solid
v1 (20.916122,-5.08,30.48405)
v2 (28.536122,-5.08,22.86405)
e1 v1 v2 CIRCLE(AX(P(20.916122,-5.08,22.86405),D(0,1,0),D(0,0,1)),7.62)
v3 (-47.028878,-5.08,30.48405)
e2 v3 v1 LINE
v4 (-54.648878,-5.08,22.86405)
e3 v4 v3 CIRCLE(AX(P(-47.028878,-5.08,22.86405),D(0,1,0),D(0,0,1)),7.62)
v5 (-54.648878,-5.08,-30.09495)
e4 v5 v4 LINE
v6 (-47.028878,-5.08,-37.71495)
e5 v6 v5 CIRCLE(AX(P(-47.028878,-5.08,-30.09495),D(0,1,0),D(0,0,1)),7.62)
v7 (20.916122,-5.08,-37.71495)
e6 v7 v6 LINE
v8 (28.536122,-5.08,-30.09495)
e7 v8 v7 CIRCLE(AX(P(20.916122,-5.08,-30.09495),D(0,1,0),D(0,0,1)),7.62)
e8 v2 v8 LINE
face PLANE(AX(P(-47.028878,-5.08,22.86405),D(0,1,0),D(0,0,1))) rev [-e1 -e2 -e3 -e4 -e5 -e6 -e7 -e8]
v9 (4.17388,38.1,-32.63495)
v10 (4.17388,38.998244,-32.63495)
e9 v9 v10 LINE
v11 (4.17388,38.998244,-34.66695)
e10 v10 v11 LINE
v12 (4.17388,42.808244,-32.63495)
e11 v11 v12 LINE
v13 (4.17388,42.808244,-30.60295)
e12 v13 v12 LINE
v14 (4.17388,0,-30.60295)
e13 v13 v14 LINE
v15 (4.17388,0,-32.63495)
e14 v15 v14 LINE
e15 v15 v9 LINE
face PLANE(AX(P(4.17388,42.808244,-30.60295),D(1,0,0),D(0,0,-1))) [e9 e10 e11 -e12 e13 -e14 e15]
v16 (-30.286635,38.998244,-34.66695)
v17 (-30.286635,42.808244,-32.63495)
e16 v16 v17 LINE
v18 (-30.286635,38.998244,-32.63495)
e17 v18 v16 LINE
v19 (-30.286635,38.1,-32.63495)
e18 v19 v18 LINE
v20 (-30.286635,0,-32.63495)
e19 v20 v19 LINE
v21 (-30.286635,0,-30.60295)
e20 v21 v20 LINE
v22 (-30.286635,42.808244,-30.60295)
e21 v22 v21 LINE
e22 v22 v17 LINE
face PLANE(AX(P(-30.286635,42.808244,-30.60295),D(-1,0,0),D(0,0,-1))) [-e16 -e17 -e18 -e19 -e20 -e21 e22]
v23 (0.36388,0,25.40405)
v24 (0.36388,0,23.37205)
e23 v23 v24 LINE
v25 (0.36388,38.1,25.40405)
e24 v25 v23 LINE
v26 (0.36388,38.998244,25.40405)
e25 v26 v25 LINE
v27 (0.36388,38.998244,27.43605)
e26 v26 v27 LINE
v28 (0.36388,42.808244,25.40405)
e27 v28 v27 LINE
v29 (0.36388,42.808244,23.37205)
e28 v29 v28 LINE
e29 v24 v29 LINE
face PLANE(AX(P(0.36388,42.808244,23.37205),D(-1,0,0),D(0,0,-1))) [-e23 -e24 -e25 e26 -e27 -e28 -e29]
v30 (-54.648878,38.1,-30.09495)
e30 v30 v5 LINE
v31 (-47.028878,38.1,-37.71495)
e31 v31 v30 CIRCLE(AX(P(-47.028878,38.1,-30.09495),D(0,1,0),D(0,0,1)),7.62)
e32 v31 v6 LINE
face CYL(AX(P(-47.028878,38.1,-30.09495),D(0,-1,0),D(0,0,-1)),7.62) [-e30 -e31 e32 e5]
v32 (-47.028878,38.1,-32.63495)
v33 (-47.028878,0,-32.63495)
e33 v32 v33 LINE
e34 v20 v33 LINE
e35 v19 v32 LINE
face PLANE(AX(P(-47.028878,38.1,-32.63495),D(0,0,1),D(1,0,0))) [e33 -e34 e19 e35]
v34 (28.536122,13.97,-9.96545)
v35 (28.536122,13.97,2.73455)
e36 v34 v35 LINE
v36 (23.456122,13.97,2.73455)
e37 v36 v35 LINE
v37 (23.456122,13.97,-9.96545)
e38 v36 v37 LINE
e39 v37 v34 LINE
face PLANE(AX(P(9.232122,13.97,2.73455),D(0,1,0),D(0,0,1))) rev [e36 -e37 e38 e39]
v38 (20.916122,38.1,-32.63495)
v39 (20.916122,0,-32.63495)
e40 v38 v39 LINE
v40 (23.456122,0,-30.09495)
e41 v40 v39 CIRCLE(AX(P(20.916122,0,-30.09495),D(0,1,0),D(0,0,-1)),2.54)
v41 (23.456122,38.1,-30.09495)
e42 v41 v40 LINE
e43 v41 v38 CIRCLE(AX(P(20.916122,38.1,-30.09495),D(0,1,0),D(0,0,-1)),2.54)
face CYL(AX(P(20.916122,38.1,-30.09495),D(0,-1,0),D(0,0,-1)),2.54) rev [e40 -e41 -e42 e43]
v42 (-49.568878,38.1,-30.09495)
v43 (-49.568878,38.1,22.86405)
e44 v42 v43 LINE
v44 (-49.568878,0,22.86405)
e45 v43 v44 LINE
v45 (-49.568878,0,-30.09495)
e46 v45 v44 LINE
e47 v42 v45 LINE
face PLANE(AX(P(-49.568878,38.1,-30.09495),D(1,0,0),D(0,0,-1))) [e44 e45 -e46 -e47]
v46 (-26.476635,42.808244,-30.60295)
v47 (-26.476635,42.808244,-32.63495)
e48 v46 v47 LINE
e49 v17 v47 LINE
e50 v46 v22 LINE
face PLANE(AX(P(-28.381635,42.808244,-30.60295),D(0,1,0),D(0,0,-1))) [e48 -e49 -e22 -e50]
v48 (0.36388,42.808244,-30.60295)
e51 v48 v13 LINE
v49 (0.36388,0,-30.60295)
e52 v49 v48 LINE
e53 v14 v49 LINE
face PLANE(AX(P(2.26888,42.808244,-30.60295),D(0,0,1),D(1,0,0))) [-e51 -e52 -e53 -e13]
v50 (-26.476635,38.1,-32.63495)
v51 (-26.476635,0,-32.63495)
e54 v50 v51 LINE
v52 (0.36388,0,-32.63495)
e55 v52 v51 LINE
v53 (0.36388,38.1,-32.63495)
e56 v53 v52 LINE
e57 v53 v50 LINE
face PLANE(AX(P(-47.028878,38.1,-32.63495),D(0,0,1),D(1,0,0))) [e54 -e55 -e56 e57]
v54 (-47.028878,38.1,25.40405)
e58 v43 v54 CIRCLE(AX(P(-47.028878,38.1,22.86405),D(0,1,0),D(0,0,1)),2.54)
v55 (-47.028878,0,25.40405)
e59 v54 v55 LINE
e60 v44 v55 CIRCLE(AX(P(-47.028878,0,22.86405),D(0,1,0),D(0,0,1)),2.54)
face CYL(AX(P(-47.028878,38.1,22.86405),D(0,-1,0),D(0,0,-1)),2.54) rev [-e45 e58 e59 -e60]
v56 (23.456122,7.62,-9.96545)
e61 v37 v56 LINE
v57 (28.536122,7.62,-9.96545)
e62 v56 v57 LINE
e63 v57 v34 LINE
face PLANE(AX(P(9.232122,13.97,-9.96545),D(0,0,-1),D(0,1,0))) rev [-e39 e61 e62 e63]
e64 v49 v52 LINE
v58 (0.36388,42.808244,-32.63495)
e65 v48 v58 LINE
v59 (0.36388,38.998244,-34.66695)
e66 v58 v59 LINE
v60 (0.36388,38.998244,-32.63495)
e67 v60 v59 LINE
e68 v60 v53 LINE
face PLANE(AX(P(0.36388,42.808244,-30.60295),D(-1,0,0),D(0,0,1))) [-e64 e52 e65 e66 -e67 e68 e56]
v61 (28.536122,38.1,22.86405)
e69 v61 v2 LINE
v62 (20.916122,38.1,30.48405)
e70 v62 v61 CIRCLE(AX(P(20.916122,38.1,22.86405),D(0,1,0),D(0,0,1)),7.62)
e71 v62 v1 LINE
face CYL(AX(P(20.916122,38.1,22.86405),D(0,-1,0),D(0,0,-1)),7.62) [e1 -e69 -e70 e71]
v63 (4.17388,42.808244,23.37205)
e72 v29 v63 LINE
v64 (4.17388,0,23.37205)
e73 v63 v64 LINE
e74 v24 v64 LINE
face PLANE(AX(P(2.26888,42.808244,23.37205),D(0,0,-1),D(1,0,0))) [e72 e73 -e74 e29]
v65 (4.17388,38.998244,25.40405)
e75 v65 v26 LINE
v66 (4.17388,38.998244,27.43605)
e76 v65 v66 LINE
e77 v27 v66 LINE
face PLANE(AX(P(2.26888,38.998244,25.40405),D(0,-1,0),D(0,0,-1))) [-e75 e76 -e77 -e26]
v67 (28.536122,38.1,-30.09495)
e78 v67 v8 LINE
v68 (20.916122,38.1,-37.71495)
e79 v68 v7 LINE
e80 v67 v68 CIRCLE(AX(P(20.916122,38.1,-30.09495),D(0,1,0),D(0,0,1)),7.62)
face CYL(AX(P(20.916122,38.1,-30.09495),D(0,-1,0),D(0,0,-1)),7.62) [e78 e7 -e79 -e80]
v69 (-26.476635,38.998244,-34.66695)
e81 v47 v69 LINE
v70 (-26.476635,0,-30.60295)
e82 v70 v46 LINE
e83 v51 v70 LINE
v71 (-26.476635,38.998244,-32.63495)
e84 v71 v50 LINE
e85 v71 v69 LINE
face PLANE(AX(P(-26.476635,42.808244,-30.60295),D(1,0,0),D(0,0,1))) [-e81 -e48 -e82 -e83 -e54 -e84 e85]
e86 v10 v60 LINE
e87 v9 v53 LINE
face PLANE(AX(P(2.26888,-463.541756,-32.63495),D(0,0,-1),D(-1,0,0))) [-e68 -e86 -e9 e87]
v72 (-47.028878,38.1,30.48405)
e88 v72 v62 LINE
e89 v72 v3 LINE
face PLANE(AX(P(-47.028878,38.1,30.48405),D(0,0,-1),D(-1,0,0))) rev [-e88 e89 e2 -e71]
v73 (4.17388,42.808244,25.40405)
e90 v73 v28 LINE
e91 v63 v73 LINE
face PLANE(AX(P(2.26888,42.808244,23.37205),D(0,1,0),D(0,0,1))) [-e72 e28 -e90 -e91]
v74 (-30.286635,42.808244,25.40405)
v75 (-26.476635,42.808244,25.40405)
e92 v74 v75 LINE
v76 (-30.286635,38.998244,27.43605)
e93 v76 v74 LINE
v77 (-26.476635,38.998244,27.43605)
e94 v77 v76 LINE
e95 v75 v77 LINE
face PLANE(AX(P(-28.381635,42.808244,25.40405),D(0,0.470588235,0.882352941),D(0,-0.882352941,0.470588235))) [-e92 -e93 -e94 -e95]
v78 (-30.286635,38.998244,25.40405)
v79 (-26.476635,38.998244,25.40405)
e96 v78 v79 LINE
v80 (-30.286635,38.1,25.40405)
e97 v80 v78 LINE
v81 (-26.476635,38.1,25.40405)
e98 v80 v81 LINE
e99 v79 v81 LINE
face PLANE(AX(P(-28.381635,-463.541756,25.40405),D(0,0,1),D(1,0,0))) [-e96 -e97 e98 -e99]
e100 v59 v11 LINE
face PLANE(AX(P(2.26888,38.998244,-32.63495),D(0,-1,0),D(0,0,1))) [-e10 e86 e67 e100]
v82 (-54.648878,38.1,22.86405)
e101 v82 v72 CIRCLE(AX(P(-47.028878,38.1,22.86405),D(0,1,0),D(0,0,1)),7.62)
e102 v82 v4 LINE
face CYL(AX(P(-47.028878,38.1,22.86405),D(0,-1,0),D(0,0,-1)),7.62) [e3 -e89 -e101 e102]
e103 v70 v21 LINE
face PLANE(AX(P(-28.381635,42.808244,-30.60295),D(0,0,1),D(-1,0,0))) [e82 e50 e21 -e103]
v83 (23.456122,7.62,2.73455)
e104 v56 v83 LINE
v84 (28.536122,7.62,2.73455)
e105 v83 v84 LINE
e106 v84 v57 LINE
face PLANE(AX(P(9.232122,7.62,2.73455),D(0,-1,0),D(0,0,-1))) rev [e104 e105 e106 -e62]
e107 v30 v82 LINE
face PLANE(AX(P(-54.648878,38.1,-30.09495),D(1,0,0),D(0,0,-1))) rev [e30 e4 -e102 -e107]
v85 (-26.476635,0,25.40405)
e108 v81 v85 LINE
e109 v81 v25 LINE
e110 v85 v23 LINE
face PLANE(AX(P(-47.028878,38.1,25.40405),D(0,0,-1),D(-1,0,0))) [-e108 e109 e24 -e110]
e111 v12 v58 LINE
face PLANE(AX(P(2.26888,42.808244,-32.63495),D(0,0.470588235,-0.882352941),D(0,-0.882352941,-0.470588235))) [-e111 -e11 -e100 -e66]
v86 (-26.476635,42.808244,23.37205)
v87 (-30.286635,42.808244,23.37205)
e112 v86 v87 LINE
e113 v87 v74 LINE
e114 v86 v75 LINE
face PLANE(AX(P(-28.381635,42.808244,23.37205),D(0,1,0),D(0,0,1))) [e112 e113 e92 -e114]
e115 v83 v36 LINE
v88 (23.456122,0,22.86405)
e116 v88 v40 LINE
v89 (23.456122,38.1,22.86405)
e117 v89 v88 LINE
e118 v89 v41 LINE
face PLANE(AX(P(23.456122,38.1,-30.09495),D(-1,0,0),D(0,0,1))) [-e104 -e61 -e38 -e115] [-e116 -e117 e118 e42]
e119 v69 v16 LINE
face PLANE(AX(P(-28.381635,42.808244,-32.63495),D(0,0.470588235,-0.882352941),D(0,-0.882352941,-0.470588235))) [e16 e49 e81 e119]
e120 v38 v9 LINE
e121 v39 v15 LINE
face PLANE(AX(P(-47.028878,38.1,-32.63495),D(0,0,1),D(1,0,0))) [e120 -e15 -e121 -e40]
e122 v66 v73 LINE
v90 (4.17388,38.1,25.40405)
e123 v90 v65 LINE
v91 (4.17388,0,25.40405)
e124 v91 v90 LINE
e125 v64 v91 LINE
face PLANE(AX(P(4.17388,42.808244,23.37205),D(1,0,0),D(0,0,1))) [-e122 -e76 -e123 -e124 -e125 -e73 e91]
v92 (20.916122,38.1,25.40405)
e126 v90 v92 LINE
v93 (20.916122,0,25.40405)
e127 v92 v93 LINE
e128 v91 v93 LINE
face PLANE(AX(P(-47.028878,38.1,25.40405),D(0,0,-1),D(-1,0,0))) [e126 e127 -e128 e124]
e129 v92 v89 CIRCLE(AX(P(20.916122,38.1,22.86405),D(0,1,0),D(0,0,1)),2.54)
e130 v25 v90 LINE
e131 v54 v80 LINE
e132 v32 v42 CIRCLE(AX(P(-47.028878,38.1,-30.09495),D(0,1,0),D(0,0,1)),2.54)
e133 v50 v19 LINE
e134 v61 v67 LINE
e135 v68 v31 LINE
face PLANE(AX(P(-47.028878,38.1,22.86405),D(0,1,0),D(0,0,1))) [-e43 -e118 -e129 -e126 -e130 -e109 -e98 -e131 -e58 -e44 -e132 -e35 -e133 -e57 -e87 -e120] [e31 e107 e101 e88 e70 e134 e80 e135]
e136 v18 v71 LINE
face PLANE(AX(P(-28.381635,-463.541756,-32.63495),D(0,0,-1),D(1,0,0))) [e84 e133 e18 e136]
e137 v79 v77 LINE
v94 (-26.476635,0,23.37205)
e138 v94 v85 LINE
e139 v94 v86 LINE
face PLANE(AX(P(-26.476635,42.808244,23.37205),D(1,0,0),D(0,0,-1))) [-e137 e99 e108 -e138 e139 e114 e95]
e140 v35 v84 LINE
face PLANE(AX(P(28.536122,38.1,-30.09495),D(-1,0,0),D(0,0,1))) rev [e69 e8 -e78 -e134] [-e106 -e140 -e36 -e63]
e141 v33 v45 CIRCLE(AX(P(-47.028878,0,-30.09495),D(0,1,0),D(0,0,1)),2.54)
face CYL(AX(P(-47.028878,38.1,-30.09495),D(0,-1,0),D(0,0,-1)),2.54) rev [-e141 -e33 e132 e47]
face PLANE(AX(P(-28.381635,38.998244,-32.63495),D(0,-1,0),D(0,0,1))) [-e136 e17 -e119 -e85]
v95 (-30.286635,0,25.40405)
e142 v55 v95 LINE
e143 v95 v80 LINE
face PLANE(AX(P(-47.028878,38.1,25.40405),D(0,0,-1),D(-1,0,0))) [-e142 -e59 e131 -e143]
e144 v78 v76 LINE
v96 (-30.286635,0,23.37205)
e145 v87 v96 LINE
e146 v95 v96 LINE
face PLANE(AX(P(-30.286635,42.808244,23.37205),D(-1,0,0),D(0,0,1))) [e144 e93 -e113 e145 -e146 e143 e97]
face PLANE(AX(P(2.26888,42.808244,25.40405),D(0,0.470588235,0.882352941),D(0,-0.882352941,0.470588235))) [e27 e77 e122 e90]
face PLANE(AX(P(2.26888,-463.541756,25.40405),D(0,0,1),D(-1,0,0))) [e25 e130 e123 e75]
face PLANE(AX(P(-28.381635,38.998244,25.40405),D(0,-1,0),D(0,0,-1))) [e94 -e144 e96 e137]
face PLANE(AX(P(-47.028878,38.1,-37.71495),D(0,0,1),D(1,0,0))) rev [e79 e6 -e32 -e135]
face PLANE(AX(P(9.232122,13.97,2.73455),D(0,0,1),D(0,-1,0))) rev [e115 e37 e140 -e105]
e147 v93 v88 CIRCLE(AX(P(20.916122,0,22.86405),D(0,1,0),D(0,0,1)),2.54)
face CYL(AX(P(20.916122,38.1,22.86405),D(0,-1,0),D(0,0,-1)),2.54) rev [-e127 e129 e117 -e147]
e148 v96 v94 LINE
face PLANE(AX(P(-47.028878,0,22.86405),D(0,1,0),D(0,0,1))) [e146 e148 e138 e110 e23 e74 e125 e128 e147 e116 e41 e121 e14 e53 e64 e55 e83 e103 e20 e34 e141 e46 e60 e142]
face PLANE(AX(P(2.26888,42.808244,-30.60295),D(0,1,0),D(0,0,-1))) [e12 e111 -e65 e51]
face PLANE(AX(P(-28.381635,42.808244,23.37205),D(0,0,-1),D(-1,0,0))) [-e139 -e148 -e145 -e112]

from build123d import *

# Parameters (mm, degrees)
BOSS_EXTRUDE1_DEPTH  = 38.1
SHELL1_T             = 5.08
SNAP_START           = -30.286635041
SNAP_HOOK1_DEPTH     = 3.81
MIRROR2_START        = -30.286635041
MIRROR2_COPY_1_DEPTH = 3.81
SKETCH2_W            = 12.7
SKETCH2_H            = 6.35
CUT_EXTRUDE1_DEPTH   = 19.304


# Read off the part's stored shape, not the designer's step: Snap Hook1
with BuildPart() as part:
    # Sketch1 → Boss-Extrude1 (new body)
    with BuildSketch(Plane(origin=(0, 0, 0), x_dir=(1, 0, 0), z_dir=(0, 1, 0))):
        with BuildLine():
            Line((-47.028877551, 32.634950255), (20.916122449, 32.634950255))
            ThreePointArc((20.916122449, 32.634950255), (22.712173673, 31.891001479), (23.456122449, 30.094950255))
            Line((23.456122449, 30.094950255), (23.456122449, -22.864049745))
            ThreePointArc((23.456122449, -22.864049745), (22.712173673, -24.660100969), (20.916122449, -25.404049745))
            Line((20.916122449, -25.404049745), (-47.028877551, -25.404049745))
            ThreePointArc((-47.028877551, -25.404049745), (-48.824928775, -24.660100969), (-49.568877551, -22.864049745))
            Line((-49.568877551, -22.864049745), (-49.568877551, 30.094950255))
            ThreePointArc((-49.568877551, 30.094950255), (-48.824928775, 31.891001479), (-47.028877551, 32.634950255))
        make_face()
    extrude(amount=BOSS_EXTRUDE1_DEPTH)

    # Shell1
    shell1_openings = [part.faces().sort_by_distance(p)[0] for p in [
        (-13.056377551, 38.1, -3.615450255),
    ]]
    offset(amount=SHELL1_T, openings=shell1_openings, kind=Kind.INTERSECTION)

    # Snap Hook1 outline → Snap Hook1 (add)
    with BuildSketch(Plane.YZ.offset(SNAP_START)):
        Polygon((38.998243942, -34.666950255), (42.808243942, -32.634950255), (42.808243942, -30.602950255), (0, -30.602950255), (0, -32.634950255), (38.998243942, -32.634950255), align=None)
    snap_hook1 = extrude(amount=SNAP_HOOK1_DEPTH)

    # Mirror1: Snap Hook1 across plane
    add(snap_hook1.mirror(Plane.XY.offset(-3.615450255)))

    # Mirror2: Snap Hook1 across plane
    add(snap_hook1.mirror(Plane(origin=(-13.056377551, 0, 0), x_dir=(0, 0, 1), z_dir=(1, 0, 0))))

    # Mirror2 copy 1 sketch → Mirror2 copy 1 (add)
    with BuildSketch(Plane(origin=(-26.112755102, 0, -7.23090051), x_dir=(0, 1, 0), z_dir=(-1, 0, 0)).offset(MIRROR2_START)):
        Polygon((38.998243942, -34.666950255), (42.808243942, -32.634950255), (42.808243942, -30.602950255), (0, -30.602950255), (0, -32.634950255), (38.998243942, -32.634950255), align=None)
    extrude(amount=MIRROR2_COPY_1_DEPTH)

    # Sketch2 → Cut-Extrude1 (cut)
    with BuildSketch(Plane(origin=(28.536122449, 0, 0), x_dir=(0, 0, -1), z_dir=(1, 0, 0))):
        with Locations((3.615450255, 10.795)):
            Rectangle(SKETCH2_W, SKETCH2_H)
    extrude(amount=-CUT_EXTRUDE1_DEPTH, mode=Mode.SUBTRACT)


solid = part.part
